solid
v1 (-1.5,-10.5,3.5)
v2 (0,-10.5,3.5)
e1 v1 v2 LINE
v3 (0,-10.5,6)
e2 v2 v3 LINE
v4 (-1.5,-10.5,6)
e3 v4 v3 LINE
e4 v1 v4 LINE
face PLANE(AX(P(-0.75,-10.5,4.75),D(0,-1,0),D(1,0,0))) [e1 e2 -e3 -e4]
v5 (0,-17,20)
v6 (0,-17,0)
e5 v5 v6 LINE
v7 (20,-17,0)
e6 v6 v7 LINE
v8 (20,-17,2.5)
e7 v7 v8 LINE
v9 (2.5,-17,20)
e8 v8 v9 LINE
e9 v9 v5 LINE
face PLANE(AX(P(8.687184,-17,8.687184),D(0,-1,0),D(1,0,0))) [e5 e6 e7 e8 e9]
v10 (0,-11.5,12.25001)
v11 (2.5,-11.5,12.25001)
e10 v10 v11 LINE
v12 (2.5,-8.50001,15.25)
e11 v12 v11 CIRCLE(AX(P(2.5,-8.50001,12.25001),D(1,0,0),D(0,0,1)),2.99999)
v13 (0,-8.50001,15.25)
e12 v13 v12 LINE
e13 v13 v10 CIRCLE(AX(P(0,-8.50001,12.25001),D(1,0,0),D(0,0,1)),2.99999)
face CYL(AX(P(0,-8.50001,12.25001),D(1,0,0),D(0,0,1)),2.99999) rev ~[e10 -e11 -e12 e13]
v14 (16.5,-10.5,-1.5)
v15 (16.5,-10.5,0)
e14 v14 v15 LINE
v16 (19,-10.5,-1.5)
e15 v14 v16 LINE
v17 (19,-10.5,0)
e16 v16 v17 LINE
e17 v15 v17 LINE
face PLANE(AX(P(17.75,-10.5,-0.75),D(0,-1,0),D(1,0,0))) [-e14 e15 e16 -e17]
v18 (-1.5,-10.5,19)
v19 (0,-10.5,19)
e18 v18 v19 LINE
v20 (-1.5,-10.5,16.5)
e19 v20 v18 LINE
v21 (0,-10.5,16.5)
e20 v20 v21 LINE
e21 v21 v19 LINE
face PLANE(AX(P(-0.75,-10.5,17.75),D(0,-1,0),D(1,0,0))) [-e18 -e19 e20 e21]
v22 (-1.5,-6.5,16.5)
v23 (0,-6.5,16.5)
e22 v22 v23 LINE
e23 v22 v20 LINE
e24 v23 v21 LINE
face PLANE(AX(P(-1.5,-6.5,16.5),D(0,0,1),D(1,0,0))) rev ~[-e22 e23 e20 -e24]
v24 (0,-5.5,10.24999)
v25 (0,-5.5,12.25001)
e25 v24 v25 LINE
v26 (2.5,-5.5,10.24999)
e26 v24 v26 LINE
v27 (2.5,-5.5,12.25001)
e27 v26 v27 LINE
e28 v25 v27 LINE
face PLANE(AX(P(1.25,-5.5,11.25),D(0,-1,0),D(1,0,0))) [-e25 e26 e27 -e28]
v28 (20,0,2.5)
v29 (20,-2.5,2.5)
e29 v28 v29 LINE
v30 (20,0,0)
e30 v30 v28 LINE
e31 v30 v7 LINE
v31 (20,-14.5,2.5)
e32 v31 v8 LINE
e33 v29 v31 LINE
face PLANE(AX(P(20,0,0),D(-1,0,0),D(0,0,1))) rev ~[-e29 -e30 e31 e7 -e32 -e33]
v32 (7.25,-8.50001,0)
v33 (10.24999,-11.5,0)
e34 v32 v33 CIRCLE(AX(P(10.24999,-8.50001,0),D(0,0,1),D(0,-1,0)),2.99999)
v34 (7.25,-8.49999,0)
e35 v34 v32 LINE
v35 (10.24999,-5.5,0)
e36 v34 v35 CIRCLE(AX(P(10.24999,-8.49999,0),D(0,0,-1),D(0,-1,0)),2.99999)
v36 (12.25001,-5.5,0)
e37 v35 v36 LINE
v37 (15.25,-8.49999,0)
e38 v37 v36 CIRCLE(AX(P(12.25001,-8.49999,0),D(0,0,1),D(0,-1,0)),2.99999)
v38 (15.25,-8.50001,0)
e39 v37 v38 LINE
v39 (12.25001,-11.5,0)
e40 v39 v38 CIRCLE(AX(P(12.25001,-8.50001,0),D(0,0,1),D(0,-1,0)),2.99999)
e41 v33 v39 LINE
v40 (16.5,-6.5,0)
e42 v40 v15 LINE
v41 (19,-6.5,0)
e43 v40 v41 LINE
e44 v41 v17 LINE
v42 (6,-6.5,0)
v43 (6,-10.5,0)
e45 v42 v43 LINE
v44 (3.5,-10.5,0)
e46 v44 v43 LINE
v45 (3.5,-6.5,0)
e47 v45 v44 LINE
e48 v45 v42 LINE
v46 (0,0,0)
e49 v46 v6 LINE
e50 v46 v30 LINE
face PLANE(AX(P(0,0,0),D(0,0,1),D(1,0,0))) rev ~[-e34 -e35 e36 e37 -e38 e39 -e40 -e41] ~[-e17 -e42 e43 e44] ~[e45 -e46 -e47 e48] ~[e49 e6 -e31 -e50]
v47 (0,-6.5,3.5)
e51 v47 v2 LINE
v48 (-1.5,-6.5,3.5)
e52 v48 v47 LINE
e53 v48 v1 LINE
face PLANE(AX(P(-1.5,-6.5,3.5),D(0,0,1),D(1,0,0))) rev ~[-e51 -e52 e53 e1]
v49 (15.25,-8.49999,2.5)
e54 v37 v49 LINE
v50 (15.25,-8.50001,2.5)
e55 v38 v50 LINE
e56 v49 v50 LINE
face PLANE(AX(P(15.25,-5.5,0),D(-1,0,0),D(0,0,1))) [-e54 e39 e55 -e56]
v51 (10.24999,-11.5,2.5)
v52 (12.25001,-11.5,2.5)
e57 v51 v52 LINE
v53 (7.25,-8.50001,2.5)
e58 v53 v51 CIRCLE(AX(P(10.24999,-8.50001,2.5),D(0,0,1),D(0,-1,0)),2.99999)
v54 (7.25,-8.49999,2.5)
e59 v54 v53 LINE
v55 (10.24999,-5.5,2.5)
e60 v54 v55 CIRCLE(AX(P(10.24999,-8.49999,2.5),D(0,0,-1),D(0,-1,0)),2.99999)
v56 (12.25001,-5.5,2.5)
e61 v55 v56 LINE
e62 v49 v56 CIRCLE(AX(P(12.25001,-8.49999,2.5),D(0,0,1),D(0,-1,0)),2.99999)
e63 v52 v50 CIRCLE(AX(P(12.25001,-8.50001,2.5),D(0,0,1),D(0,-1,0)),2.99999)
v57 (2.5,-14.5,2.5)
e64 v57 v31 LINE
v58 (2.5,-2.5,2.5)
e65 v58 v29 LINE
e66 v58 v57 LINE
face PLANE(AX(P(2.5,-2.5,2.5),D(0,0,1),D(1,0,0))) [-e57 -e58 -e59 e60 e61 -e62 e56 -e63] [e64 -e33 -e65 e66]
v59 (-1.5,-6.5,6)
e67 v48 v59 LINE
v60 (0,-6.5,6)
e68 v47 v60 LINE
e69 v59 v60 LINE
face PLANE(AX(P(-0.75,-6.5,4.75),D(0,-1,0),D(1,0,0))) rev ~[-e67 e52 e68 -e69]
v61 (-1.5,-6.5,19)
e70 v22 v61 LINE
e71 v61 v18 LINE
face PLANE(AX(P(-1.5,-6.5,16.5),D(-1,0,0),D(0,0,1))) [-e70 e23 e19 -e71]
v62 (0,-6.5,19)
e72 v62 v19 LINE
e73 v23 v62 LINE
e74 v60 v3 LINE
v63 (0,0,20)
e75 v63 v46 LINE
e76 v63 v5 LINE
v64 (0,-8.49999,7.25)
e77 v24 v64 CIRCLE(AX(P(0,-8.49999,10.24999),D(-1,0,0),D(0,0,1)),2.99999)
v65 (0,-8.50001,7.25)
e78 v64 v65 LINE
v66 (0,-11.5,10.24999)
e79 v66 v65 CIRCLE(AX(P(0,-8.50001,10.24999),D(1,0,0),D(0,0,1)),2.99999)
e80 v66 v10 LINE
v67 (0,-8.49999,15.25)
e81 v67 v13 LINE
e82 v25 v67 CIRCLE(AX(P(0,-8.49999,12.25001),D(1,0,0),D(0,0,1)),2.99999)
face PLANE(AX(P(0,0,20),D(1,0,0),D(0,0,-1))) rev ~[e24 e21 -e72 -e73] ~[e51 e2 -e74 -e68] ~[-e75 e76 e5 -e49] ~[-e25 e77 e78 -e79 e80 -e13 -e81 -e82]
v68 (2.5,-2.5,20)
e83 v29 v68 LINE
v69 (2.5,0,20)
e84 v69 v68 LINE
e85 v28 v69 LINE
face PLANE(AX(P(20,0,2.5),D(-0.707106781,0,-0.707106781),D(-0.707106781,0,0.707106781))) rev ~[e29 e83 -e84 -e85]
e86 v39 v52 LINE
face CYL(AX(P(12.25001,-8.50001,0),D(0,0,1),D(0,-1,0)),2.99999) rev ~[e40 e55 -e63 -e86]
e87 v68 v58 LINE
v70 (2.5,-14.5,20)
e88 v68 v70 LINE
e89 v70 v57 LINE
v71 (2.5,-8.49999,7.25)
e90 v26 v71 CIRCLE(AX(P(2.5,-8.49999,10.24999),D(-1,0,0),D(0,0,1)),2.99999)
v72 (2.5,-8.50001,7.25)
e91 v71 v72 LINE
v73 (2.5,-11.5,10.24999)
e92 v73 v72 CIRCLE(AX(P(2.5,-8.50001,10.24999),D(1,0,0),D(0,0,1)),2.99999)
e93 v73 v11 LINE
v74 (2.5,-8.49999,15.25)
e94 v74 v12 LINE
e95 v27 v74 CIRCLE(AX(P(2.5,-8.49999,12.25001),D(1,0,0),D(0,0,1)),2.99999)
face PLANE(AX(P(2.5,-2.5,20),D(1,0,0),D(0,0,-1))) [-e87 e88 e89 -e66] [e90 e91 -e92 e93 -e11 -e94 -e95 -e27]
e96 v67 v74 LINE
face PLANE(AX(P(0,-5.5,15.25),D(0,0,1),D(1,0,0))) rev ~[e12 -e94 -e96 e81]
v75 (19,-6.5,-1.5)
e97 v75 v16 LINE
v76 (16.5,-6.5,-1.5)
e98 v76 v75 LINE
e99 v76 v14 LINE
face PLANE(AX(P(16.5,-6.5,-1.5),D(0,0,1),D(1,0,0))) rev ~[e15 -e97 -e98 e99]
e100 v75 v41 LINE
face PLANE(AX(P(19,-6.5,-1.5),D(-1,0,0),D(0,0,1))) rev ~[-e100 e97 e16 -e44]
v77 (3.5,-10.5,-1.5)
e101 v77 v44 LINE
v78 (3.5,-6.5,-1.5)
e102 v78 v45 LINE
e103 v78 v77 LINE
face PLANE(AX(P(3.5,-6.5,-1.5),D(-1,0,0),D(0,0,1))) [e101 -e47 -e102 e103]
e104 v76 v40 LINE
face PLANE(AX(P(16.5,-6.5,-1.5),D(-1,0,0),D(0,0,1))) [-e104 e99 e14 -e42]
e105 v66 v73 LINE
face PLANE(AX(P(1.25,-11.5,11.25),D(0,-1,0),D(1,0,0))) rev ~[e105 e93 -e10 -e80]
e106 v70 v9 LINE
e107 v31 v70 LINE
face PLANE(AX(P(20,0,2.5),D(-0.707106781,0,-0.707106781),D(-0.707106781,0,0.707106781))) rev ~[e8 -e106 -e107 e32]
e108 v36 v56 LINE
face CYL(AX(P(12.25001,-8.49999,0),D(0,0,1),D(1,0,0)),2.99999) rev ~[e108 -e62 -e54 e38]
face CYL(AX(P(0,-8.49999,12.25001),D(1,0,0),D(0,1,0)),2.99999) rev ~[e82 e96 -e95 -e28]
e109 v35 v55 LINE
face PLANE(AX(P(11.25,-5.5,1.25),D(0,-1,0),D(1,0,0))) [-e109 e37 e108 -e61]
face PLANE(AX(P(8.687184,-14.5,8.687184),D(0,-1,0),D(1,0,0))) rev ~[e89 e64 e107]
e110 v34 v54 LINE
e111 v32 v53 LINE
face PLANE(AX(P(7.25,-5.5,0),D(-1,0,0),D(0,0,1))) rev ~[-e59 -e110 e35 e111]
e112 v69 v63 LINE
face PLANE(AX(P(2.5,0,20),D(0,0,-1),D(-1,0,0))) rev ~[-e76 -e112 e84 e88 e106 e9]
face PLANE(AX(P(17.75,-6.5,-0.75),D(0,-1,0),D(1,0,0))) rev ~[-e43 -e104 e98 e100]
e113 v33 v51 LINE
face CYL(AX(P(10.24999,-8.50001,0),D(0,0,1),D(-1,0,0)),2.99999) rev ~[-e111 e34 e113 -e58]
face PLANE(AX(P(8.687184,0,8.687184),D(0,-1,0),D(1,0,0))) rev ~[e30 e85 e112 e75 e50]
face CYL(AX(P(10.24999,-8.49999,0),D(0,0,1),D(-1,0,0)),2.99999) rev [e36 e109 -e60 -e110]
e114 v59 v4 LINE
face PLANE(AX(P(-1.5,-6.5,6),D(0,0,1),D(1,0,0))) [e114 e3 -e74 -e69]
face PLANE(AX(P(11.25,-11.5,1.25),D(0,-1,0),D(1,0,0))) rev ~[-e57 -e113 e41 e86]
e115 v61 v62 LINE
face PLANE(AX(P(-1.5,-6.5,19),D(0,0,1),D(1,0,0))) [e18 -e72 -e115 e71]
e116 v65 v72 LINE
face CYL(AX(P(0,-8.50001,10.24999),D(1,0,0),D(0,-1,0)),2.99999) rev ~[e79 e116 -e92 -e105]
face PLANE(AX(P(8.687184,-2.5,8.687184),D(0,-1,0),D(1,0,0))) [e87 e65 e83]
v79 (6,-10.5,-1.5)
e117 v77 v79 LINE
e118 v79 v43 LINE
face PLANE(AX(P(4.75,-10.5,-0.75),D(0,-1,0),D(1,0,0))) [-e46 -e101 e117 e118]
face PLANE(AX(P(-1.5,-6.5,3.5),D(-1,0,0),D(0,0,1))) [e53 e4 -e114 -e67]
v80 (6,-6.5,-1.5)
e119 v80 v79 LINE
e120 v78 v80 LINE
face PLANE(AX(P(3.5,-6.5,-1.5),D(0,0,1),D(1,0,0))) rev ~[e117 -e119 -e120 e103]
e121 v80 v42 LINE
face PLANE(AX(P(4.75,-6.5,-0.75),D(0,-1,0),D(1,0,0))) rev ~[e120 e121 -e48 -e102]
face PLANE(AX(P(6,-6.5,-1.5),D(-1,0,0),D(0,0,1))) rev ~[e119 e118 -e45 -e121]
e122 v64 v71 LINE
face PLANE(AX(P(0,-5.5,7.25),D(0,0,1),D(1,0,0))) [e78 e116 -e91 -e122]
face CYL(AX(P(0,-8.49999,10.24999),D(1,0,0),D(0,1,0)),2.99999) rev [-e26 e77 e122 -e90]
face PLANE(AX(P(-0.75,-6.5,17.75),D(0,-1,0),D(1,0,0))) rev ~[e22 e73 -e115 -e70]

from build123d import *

# Parameters (mm, degrees)
F0_W     = 2.5
F0_H     = 8
F0_W_2   = 8
F0_H_2   = 2.5
F1_DEPTH = 17
F2_START = 2.5
F2_DEPTH = 12
F3_START = 5.5
F3_DEPTH = 6
F4_R     = 2.99999
F5_START = 6.5
F0_W_3   = 1.5
F0_H_3   = 1.5
F5_DEPTH = 4


# Not quite as in the source:
# - a fillet or chamfer is up to 0.001 mm smaller than in the source, because OpenCascade refuses the exact size


with BuildPart() as f1:
    # F0 (on Front) → F1 (new body)
    with BuildSketch(Plane.XZ):
        Polygon((20, 2.5), (2.5, 20), (2.5, 15.25), (2.5, 7.25), (2.5, 2.5), (7.25, 2.5), (15.25, 2.5), align=None)
        Polygon((20, 0), (20, 2.5), (15.25, 2.5), (15.25, 0), (16.5, 0), (19, 0), align=None)
        Polygon((2.5, 20), (0, 20), (0, 19), (0, 16.5), (0, 15.25), (2.5, 15.25), align=None)
        Polygon((2.5, 2.5), (2.5, 7.25), (0, 7.25), (0, 6), (0, 3.5), (0, 0), (3.5, 0), (6, 0), (7.25, 0), (7.25, 2.5), align=None)
        with Locations((1.25, 11.25)):
            Rectangle(F0_W, F0_H)
        with Locations((11.25, 1.25)):
            Rectangle(F0_W_2, F0_H_2)
    extrude(amount=F1_DEPTH)

    # F0 (on Front) → F2 (cut)
    with BuildSketch(Plane.XZ.offset(F2_START)):
        Polygon((20, 2.5), (2.5, 20), (2.5, 15.25), (2.5, 7.25), (2.5, 2.5), (7.25, 2.5), (15.25, 2.5), align=None)
    extrude(amount=F2_DEPTH, mode=Mode.SUBTRACT)

    # F0 (on Front) → F3 (cut)
    with BuildSketch(Plane.XZ.offset(F3_START)):
        with Locations((1.25, 11.25)):
            Rectangle(F0_W, F0_H)
        with Locations((11.25, 1.25)):
            Rectangle(F0_W_2, F0_H_2)
    extrude(amount=F3_DEPTH, mode=Mode.SUBTRACT)

    # F4 (radius 3 in the source; OpenCascade refuses exactly that, so slightly less here)
    f4_edges = [f1.edges().sort_by_distance(p)[0] for p in [
        (1.25, -11.5, 7.25),
        (1.25, -5.5, 7.25),
        (1.25, -11.5, 15.25),
        (1.25, -5.5, 15.25),
        (7.25, -11.5, 1.25),
        (7.25, -5.5, 1.25),
        (15.25, -11.5, 1.25),
        (15.25, -5.5, 1.25),
    ]]
    fillet(f4_edges, radius=F4_R)

    # F0 (on Front) → F5 (join)
    with BuildSketch(Plane.XZ.offset(F5_START)):
        with Locations((-0.75, 17.75)):
            Rectangle(F0_W_3, F0_H_2)
        with Locations((-0.75, 4.75)):
            Rectangle(F0_W_3, F0_H_2)
        with Locations((4.75, -0.75)):
            Rectangle(F0_W, F0_H_3)
        with Locations((17.75, -0.75)):
            Rectangle(F0_W, F0_H_3)
    extrude(amount=F5_DEPTH)


solid = f1.part
